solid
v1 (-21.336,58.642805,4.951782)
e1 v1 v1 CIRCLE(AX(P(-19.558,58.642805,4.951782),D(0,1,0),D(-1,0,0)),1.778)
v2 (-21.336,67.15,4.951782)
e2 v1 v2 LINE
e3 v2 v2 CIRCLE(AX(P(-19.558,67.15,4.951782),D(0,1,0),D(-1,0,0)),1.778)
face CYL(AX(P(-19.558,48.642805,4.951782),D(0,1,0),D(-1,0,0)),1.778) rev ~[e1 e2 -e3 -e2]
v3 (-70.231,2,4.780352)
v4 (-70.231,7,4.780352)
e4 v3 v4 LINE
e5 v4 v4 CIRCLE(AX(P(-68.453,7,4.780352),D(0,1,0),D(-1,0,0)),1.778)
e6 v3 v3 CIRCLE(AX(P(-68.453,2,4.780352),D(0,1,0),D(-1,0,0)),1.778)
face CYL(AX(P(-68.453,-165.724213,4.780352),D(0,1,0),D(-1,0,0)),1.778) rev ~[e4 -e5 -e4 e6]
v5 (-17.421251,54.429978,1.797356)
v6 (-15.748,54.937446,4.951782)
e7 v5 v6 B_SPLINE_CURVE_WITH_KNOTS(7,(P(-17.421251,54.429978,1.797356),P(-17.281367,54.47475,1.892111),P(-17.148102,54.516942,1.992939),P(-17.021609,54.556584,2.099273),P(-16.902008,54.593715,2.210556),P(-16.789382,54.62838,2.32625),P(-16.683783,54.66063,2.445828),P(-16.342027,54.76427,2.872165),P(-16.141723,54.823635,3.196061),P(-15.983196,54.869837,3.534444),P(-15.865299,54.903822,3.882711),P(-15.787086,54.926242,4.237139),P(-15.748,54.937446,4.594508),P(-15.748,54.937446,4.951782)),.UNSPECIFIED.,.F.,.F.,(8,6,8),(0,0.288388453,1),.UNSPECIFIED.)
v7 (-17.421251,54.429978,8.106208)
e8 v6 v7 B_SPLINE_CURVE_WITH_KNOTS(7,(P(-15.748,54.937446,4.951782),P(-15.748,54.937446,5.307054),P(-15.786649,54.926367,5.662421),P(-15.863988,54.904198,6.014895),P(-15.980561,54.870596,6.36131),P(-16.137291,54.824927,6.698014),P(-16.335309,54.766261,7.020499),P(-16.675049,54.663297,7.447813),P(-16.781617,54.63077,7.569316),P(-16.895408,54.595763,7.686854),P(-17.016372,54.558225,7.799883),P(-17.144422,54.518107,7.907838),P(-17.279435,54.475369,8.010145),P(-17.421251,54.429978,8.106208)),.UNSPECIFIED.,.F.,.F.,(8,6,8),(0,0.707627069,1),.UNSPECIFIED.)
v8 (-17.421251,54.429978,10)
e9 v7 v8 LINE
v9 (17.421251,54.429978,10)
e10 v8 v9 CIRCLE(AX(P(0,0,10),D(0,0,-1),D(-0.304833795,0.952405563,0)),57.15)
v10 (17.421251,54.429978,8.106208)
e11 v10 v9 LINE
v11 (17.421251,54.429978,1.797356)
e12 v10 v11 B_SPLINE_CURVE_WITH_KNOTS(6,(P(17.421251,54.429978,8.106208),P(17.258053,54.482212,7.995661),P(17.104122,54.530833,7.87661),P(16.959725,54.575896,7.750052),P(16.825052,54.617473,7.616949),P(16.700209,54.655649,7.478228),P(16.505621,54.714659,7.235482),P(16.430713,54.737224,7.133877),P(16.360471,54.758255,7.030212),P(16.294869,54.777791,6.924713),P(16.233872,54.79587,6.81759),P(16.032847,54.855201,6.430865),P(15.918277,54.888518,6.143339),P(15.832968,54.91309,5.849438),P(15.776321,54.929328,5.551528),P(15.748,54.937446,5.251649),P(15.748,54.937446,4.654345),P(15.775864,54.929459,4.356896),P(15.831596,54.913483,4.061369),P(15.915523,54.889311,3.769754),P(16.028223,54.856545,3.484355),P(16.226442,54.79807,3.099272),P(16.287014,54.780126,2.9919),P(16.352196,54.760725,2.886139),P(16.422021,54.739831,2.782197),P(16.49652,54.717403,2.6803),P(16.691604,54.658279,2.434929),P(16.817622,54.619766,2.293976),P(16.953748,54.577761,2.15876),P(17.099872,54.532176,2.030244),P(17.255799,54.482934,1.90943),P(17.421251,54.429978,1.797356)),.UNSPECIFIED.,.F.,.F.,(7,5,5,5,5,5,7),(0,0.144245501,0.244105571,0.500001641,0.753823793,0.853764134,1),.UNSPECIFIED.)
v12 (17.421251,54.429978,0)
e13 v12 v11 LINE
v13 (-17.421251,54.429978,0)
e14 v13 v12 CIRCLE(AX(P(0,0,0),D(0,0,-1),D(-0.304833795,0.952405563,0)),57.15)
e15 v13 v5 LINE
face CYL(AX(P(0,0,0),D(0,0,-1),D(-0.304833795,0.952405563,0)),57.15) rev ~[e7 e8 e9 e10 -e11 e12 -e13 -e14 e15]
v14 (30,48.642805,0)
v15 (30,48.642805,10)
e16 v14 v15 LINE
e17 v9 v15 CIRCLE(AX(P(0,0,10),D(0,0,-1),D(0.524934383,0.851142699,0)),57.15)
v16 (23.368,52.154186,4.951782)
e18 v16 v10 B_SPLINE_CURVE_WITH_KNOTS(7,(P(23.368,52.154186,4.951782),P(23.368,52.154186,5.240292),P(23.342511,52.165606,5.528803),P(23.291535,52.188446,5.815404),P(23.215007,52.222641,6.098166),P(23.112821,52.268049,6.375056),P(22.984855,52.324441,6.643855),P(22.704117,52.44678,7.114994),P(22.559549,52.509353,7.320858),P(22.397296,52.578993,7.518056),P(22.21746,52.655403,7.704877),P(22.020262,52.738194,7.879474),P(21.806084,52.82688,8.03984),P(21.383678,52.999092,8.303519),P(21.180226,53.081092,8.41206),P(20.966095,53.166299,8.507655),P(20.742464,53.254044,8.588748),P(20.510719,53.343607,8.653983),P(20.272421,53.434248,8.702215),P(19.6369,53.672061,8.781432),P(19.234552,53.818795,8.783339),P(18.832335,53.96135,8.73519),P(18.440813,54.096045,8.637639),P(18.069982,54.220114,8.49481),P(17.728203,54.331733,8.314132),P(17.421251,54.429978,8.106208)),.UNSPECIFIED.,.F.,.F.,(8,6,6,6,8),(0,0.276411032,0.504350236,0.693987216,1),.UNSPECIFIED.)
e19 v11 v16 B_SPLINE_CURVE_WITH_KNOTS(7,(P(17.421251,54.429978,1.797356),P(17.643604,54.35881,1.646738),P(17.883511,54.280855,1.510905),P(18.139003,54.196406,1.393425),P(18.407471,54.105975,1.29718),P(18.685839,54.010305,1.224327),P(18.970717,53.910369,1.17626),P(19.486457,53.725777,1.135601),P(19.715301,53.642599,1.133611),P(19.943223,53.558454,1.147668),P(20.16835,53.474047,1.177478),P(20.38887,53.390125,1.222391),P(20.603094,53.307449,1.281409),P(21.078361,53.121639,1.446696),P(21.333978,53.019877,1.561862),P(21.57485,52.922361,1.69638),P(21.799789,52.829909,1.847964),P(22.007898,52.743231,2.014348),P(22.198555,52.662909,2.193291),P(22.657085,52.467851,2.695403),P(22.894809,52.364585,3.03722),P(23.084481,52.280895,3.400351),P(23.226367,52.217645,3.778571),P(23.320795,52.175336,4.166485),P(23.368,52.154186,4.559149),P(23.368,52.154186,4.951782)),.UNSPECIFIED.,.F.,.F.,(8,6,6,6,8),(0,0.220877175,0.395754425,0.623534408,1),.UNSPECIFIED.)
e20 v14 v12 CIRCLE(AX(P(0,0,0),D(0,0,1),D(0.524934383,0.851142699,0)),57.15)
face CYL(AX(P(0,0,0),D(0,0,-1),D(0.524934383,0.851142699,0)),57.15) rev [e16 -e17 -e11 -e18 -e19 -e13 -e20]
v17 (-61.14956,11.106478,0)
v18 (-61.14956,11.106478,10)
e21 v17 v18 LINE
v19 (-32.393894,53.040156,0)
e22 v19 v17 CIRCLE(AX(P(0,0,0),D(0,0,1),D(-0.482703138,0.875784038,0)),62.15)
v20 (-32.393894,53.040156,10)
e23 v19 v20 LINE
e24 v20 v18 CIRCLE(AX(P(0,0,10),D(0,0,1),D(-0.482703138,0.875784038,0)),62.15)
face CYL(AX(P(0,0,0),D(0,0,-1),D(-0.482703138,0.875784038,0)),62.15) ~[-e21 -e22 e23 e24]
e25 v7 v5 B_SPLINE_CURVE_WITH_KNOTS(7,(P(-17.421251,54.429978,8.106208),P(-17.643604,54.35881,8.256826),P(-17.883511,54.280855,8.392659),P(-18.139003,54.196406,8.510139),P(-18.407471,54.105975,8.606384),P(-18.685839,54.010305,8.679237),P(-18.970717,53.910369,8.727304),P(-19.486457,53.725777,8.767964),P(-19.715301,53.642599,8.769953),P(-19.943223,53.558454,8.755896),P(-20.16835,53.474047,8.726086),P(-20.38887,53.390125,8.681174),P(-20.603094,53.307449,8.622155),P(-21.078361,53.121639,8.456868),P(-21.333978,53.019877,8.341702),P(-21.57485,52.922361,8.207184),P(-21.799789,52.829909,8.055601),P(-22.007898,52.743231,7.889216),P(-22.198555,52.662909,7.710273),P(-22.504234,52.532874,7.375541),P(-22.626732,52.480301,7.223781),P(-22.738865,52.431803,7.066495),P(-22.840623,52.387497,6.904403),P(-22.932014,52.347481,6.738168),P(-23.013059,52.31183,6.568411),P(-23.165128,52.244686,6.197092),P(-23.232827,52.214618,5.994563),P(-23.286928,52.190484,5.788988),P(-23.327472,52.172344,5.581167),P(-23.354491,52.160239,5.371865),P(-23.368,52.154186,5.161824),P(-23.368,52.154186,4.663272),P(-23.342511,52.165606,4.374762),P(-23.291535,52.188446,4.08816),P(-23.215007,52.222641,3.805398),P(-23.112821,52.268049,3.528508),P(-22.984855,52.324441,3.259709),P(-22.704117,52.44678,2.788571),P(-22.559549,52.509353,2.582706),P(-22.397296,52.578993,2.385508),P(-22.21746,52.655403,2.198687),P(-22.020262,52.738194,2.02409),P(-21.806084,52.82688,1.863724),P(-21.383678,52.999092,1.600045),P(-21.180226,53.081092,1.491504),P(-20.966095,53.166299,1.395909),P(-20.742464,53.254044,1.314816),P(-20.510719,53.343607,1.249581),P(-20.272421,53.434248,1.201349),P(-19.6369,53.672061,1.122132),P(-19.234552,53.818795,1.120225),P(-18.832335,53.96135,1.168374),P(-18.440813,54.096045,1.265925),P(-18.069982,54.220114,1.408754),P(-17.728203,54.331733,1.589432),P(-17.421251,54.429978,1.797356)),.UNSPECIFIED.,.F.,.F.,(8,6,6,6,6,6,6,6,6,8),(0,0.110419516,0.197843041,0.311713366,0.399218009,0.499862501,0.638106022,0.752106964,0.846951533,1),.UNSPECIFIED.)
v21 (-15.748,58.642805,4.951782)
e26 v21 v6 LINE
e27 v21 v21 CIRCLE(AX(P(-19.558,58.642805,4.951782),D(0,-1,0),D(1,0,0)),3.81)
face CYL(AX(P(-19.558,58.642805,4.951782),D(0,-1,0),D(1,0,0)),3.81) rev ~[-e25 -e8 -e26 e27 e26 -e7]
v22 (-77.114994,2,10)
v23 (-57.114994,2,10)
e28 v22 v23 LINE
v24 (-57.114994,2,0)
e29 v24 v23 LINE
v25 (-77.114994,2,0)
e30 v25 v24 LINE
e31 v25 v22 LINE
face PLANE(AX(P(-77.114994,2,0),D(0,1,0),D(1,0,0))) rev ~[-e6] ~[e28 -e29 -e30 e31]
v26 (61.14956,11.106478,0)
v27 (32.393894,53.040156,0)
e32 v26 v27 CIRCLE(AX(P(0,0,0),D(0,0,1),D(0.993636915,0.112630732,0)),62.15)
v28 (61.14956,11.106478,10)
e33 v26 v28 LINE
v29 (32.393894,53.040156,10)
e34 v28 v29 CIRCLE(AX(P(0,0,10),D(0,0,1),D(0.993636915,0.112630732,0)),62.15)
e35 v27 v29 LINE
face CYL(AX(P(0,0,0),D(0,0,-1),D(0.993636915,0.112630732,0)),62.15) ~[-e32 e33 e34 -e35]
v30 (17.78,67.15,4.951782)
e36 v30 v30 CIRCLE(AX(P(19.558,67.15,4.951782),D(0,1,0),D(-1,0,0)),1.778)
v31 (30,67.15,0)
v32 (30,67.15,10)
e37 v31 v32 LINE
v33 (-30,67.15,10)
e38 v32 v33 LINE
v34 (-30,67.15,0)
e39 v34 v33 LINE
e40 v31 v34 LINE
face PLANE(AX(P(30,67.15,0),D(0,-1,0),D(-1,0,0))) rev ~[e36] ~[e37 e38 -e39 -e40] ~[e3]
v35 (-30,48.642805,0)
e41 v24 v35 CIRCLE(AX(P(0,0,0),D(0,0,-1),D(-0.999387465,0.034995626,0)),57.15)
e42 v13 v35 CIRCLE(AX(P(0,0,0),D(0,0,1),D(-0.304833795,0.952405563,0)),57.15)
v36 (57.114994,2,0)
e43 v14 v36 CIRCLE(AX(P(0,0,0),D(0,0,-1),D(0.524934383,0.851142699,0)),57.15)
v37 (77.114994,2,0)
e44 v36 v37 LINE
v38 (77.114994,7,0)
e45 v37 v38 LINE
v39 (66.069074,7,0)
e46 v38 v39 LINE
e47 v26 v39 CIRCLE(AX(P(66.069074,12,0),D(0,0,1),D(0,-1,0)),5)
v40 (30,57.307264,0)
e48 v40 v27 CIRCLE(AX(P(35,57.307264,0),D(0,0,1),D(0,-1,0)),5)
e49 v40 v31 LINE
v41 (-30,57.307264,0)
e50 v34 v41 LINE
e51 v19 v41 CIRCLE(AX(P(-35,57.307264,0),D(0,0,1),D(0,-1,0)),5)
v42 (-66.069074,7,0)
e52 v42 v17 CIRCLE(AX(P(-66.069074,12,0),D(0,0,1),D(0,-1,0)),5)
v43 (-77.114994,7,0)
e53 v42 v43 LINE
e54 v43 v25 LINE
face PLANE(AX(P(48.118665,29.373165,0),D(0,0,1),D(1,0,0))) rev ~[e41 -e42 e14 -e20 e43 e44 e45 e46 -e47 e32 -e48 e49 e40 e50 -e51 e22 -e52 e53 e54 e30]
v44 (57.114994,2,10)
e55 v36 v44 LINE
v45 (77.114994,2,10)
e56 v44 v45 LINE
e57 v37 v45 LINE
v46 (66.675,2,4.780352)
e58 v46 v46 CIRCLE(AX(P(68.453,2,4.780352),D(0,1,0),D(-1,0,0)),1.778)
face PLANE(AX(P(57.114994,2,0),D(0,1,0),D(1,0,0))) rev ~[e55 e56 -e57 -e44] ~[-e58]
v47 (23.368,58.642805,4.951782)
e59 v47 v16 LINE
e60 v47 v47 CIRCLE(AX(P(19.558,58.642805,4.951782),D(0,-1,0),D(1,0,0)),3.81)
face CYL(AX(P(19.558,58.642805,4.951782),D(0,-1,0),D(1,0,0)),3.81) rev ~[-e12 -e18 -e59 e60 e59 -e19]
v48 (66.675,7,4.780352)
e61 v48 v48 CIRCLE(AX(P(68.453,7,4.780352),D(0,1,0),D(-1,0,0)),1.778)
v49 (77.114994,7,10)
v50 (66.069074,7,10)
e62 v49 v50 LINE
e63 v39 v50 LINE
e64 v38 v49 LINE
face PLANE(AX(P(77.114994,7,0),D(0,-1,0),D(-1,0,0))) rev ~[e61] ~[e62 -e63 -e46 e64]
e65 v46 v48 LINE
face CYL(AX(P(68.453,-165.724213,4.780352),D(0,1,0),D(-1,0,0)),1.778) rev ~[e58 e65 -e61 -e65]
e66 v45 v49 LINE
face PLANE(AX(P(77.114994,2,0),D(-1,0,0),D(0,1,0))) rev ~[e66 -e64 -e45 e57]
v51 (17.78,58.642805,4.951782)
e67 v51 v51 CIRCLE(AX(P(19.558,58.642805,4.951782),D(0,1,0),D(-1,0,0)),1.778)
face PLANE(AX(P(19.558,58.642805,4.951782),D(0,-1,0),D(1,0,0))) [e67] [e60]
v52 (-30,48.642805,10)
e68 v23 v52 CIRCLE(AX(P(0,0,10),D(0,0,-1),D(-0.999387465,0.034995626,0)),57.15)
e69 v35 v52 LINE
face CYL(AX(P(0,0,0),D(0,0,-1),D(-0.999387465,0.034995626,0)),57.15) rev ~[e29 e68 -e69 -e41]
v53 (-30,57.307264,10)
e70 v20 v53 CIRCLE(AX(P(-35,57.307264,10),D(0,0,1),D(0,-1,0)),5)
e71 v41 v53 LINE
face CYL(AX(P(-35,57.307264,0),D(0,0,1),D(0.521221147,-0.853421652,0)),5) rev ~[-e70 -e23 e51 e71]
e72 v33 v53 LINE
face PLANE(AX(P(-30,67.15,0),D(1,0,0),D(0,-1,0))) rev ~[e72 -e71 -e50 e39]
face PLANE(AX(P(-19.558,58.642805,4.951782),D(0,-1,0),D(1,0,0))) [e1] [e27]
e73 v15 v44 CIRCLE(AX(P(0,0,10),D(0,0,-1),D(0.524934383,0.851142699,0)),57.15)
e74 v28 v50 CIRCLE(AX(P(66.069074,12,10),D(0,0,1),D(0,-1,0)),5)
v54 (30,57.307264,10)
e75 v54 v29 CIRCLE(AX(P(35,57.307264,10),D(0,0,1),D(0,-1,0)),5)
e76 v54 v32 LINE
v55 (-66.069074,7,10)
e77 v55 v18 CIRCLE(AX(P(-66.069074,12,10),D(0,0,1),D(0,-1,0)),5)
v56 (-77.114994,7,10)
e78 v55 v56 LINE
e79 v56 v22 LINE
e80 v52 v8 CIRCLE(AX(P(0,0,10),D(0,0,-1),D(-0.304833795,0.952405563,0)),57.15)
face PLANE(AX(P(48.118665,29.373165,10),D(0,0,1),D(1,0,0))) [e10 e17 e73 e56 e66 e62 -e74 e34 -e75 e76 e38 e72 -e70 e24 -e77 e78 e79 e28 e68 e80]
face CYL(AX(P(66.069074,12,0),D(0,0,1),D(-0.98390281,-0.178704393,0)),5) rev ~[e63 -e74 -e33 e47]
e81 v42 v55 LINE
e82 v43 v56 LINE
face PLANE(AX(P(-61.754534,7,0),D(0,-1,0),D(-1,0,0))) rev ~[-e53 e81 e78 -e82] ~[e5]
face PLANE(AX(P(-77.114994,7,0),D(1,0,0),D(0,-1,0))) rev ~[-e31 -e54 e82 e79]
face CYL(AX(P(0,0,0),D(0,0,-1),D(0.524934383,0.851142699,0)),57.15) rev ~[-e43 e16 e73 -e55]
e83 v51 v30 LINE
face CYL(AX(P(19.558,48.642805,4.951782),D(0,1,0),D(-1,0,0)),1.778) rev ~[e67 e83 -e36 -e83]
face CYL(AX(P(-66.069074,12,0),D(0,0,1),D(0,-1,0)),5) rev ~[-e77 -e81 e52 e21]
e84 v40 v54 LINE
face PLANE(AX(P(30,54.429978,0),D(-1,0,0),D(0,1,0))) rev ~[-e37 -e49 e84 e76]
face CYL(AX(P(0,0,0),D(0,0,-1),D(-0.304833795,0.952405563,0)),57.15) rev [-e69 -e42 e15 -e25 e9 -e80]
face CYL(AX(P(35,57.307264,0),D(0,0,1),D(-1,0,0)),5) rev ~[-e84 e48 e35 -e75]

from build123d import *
from build123d import SkipClean  # not in build123d's __all__

# Parameters (mm, degrees)
F1_DEPTH       = 10
F3_D           = 3.556
F3_CBORE_D     = 7.62
F3_CBORE_DEPTH = 10
F4_DEPTH       = 10.0010001
F6_D           = 3.556
F7_R           = 5


with BuildPart() as f1:
    # F0 (on Top) → F1 (new body)
    with BuildSketch(Plane.XY):
        with BuildLine():
            ThreePointArc((30, 48.6428052234), (49.4079280032, 28.7224502859), (57.1149936532, 2))
            Line((57.1149936532, 2), (57.1149936532, 7))
            Line((57.1149936532, 7), (61.7545342465, 7))
            ThreePointArc((61.7545342465, 7), (51.6442091706, 34.5759766187), (30, 54.4299779533))
            Line((30, 54.4299779533), (30, 48.6428052234))
        make_face()
        with BuildLine():
            ThreePointArc((17.4212513902, 54.4299779533), (23.8865362266, 51.9187431194), (30, 48.6428052234))
            Line((30, 48.6428052234), (30, 54.4299779533))
            Line((30, 54.4299779533), (17.4212513902, 54.4299779533))
        make_face()
        with BuildLine():
            ThreePointArc((-17.4212513902, 54.4299779533), (0, 57.15), (17.4212513902, 54.4299779533))
            Line((17.4212513902, 54.4299779533), (30, 54.4299779533))
            ThreePointArc((30, 54.4299779533), (15.4886954339, 60.1890589207), (7.62e-08, 62.15))
            ThreePointArc((7.62e-08, 62.15), (-15.4886953601, 60.1890589397), (-30, 54.4299779533))
            Line((-30, 54.4299779533), (-17.4212513902, 54.4299779533))
        make_face()
        with BuildLine():
            Line((-30, 54.4299779533), (-30, 48.6428052234))
            ThreePointArc((-30, 48.6428052234), (-23.8865362266, 51.9187431194), (-17.4212513902, 54.4299779533))
            Line((-17.4212513902, 54.4299779533), (-30, 54.4299779533))
        make_face()
        with BuildLine():
            ThreePointArc((-57.1149936532, 2), (-49.4079280032, 28.7224502859), (-30, 48.6428052234))
            Line((-30, 48.6428052234), (-30, 54.4299779533))
            ThreePointArc((-30, 54.4299779533), (-51.6442091706, 34.5759766187), (-61.7545342465, 7))
            Line((-61.7545342465, 7), (-57.1149936532, 7))
            Line((-57.1149936532, 7), (-57.1149936532, 2))
        make_face()
        with BuildLine():
            Line((-77.1149936532, 2), (-62.1178114553, 2))
            ThreePointArc((-62.1178114553, 2), (-61.9866074843, 4.5036643506), (-61.7545342465, 7))
            Line((-61.7545342465, 7), (-77.1149936532, 7))
            Line((-77.1149936532, 7), (-77.1149936532, 2))
        make_face()
        with BuildLine():
            Line((-62.1178114553, 2), (-57.1149936532, 2))
            Line((-57.1149936532, 2), (-57.1149936532, 7))
            Line((-57.1149936532, 7), (-61.7545342465, 7))
            ThreePointArc((-61.7545342465, 7), (-61.9866074843, 4.5036643506), (-62.1178114553, 2))
        make_face()
        with BuildLine():
            Line((57.1149936532, 7), (57.1149936532, 2))
            Line((57.1149936532, 2), (62.1178114553, 2))
            ThreePointArc((62.1178114553, 2), (61.9866074843, 4.5036643506), (61.7545342465, 7))
            Line((61.7545342465, 7), (57.1149936532, 7))
        make_face()
        with BuildLine():
            ThreePointArc((61.7545342465, 7), (61.9866074843, 4.5036643506), (62.1178114553, 2))
            Line((62.1178114553, 2), (77.1149936532, 2))
            Line((77.1149936532, 2), (77.1149936532, 7))
            Line((77.1149936532, 7), (61.7545342465, 7))
        make_face()
        with BuildLine():
            Line((-30, 62.15), (-30, 54.4299779533))
            ThreePointArc((-30, 54.4299779533), (-15.4886953601, 60.1890589397), (7.62e-08, 62.15))
            Line((7.62e-08, 62.15), (-30, 62.15))
        make_face()
        with BuildLine():
            ThreePointArc((7.62e-08, 62.15), (15.4886954339, 60.1890589207), (30, 54.4299779533))
            Line((30, 54.4299779533), (30, 62.15))
            Line((30, 62.15), (7.62e-08, 62.15))
        make_face()
        with BuildLine():
            Line((-30, 48.6428052234), (30, 48.6428052234))
            ThreePointArc((30, 48.6428052234), (23.8865362266, 51.9187431194), (17.4212513902, 54.4299779533))
            Line((17.4212513902, 54.4299779533), (-17.4212513902, 54.4299779533))
            ThreePointArc((-17.4212513902, 54.4299779533), (-23.8865362266, 51.9187431194), (-30, 48.6428052234))
        make_face()
        Polygon((-30, 62.15), (7.62e-08, 62.15), (30, 62.15), (30, 67.15), (-30, 67.15), align=None)
    extrude(amount=F1_DEPTH)

    # F3 (through all)
    with Locations(Plane.XZ.offset(-48.6428052234)):
        with Locations((-19.558, 4.9517820589), (19.558, 4.9517820589)):
            CounterBoreHole(F3_D / 2, F3_CBORE_D / 2, F3_CBORE_DEPTH)

    # F0 (on Top) → F4 (cut, through all)
    with BuildSketch(Plane.XY):
        with BuildLine():
            Line((-30, 48.6428052234), (30, 48.6428052234))
            ThreePointArc((30, 48.6428052234), (23.8865362266, 51.9187431194), (17.4212513902, 54.4299779533))
            Line((17.4212513902, 54.4299779533), (-17.4212513902, 54.4299779533))
            ThreePointArc((-17.4212513902, 54.4299779533), (-23.8865362266, 51.9187431194), (-30, 48.6428052234))
        make_face()
    with SkipClean():  # cleaning this boolean's faces spoils the solid; the shape is the same uncleaned
        extrude(amount=F4_DEPTH, mode=Mode.SUBTRACT)

    # F6 (through all)
    with Locations(Plane.XZ.offset(-2)):
        with Locations((-68.453, 4.78035165), (68.453, 4.78035165)):
            Hole(F6_D / 2)

    # F7
    f7_edges = [f1.edges().sort_by_distance(p)[0] for p in [
        (-61.754534, 7, 5),
        (61.754534, 7, 5),
        (30, 54.429978, 5),
        (-30, 54.429978, 5),
    ]]
    fillet(f7_edges, radius=F7_R)


solid = f1.part
